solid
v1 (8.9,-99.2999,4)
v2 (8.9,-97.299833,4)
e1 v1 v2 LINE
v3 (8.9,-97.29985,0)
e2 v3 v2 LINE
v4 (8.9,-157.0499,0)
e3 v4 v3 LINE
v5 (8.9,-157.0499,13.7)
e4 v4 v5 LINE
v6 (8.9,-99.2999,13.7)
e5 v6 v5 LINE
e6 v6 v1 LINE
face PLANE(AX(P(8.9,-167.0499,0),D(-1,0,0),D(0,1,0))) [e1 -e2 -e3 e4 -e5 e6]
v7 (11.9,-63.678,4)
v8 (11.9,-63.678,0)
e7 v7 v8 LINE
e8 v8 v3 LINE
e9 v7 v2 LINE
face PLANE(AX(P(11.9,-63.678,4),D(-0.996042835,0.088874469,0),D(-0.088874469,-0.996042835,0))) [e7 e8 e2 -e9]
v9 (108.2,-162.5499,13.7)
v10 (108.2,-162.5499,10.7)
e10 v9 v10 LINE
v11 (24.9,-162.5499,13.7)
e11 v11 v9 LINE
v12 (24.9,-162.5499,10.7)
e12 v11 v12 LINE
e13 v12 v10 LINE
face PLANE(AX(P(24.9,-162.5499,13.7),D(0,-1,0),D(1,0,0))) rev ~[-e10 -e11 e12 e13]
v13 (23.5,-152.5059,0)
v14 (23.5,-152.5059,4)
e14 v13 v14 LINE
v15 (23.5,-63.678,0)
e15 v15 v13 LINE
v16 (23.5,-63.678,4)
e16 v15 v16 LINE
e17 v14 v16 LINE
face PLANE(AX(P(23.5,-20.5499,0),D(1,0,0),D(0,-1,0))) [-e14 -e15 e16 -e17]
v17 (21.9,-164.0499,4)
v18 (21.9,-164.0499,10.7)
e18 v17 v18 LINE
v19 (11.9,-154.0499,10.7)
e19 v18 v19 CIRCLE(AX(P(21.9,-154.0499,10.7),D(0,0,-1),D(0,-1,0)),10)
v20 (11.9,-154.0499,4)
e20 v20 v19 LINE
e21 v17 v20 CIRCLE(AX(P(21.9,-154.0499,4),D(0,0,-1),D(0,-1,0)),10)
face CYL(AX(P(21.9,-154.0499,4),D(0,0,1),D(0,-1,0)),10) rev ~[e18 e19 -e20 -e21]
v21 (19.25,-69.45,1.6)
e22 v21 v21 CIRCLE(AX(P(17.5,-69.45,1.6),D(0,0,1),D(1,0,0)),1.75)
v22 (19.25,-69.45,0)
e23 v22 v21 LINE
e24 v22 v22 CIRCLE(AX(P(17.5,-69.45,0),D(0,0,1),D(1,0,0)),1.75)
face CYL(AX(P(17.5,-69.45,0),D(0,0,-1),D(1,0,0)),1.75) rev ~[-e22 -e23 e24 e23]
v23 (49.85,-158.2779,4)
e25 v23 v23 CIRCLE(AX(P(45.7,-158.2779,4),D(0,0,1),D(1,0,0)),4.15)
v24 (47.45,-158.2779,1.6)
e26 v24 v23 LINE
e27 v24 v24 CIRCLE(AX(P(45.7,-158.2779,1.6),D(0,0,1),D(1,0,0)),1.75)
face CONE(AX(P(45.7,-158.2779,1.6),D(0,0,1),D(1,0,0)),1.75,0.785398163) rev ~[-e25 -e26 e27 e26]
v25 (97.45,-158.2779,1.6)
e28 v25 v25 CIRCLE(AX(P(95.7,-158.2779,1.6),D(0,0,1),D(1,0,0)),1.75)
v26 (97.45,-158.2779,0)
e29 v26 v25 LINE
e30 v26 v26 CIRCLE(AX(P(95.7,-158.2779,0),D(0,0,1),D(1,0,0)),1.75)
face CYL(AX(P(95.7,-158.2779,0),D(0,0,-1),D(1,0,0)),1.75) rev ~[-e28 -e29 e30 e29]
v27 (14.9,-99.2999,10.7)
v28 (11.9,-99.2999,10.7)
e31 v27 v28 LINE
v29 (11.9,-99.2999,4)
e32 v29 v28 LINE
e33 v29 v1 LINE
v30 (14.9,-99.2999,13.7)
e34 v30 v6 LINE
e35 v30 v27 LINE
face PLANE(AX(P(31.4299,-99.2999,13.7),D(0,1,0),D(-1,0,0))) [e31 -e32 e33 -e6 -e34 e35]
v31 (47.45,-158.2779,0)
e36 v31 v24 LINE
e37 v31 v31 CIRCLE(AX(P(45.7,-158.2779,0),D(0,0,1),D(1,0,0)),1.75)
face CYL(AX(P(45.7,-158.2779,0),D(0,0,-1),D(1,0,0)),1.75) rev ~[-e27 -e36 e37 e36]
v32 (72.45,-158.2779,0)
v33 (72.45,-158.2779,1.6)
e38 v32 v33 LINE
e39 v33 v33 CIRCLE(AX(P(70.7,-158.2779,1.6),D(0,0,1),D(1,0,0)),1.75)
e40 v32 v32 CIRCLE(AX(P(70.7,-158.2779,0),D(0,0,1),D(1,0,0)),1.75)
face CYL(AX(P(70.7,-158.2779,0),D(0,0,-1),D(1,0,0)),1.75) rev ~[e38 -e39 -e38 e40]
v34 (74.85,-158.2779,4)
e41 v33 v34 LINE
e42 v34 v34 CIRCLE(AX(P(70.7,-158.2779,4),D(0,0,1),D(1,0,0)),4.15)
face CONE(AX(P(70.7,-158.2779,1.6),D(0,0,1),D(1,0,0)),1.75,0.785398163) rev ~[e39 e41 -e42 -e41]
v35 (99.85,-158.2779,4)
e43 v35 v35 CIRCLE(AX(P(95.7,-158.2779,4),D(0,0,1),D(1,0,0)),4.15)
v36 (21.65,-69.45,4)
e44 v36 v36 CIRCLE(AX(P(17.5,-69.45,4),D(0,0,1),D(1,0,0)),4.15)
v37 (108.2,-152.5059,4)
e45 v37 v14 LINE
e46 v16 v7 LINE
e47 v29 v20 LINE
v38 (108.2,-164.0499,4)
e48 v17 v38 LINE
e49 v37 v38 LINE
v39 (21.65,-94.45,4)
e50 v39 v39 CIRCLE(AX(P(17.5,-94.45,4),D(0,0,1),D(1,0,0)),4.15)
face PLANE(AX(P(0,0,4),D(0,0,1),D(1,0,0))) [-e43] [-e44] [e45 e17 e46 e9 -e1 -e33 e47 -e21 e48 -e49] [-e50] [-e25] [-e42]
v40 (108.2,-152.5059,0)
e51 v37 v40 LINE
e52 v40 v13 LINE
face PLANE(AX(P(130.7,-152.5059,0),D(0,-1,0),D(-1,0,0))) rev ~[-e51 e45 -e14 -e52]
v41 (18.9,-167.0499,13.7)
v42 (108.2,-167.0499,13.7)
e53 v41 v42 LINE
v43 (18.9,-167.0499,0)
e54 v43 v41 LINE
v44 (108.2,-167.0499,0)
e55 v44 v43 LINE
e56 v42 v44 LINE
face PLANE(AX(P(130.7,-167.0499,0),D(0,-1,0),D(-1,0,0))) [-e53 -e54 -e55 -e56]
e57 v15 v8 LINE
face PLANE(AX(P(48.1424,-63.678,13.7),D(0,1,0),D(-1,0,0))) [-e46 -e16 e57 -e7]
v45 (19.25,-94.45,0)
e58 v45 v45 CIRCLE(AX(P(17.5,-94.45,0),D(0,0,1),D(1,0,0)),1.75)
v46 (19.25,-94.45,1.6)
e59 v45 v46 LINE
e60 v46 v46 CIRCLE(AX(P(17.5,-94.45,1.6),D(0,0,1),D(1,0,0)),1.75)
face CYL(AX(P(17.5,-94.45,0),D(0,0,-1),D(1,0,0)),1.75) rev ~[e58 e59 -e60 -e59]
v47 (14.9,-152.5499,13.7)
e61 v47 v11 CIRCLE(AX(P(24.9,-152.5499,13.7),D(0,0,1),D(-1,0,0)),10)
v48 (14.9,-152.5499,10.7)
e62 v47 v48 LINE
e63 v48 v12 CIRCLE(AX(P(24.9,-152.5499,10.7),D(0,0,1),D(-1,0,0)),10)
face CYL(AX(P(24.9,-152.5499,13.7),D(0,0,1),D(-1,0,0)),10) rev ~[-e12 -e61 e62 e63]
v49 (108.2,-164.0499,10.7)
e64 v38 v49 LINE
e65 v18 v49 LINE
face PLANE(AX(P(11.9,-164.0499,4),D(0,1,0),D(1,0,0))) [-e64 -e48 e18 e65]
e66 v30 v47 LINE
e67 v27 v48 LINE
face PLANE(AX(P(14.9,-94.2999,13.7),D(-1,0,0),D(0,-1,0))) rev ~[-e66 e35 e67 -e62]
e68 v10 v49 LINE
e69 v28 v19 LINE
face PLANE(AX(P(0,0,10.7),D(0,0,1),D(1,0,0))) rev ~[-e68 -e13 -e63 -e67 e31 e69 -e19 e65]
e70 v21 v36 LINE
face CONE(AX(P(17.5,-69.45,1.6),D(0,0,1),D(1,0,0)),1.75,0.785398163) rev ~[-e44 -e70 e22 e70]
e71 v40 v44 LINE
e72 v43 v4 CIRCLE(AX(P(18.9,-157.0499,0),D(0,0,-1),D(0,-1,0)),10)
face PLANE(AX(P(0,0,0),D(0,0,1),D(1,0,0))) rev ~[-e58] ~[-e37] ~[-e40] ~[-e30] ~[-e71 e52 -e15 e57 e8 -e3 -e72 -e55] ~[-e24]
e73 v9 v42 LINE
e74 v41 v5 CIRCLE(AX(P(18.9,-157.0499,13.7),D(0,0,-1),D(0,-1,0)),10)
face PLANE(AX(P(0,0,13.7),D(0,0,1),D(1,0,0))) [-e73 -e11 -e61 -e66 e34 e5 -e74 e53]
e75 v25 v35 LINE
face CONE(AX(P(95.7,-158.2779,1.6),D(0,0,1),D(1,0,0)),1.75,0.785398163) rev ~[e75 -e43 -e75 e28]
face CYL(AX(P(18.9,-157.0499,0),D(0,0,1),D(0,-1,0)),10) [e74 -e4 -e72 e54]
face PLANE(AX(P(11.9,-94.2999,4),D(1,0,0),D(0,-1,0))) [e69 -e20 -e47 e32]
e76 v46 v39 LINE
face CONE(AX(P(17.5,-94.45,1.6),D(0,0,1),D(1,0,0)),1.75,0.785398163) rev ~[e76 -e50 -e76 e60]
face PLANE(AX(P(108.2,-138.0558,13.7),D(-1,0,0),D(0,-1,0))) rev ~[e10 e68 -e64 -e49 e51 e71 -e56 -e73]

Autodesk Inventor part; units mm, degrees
ref_plane "YZ Plane" through (0, 0, 0) normal (1, 0, 0) x (0, 1, 0)
ref_plane "XZ Plane" through (0, 0, 0) normal (0, 1, 0) x (-1, 0, 0)
ref_plane "XY Plane" through (0, 0, 0) normal (0, 0, 1) x (1, 0, 0)
sketch "Sketch1" plane through (0, 0, 0) normal (0, 0, 1) x (1, 0, 0)
  circle A0 centre (120.7, -158.2779) radius 1.75
  circle A1 centre (95.7, -158.2779) radius 1.75
  circle A2 centre (70.7, -158.2779) radius 1.75
  circle A3 centre (17.5, -69.45) radius 1.75
  circle A4 centre (17.5, -94.45) radius 1.75
  line L0 (135.7, -152.5058) -> (135.7, -164.0501) construction
  circle A5 centre (45.7, -158.2779) radius 1.75
  line L1 (0, 0) -> (135.7, 0) construction
  line L2 (135.7, 0) -> (135.7, -9.1902) construction
  circle A6 centre (125.7, -4.5951) radius 1.75 construction
  circle A7 centre (115.7, -4.5951) radius 1.75 construction
  line L3 (-18.071, -149.5998) -> (178.1747, -149.5998) construction
  line L4 (23.9, 14.4501) -> (135.7, 14.4501)
  line L5 (135.7, 14.4501) -> (135.7, -164.0499)
  line L6 (135.7, -164.0499) -> (23.9, -164.0499)
  line L7 (11.9, -152.0499) -> (11.9, 2.4501)
  arc A8 (23.9, 14.4501) -> (11.9, 2.4501) centre (23.9, 2.4501) ccw
  arc A9 (11.9, -152.0499) -> (23.9, -164.0499) centre (23.9, -152.0499) ccw construction
  line L8 (11.9, -20.5499) -> (8.9, -20.5499)
  line L9 (8.9, -20.5499) -> (8.9, -164.0499)
  line L10 (8.9, -164.0499) -> (11.9, -164.0499)
  line L11 (11.9, -154.0499) -> (11.9, -20.5499)
  line L12 (8.9, -55.2999) -> (11.9, -55.2999)
  line L13 (11.9, -55.2999) -> (11.9, -94.2999)
  line L14 (11.9, -94.2999) -> (8.9, -94.2999)
  line L15 (8.9, -94.2999) -> (8.9, -55.2999)
  line L16 (21.9, -164.0499) -> (135.7, -164.0499)
  line L17 (135.7, -164.0499) -> (135.7, -167.0499)
  line L18 (135.7, -167.0499) -> (8.9, -167.0499)
  line L19 (8.9, -167.0499) -> (8.9, -164.0499)
  arc A10 (11.9, -154.0499) -> (21.9, -164.0499) centre (21.9, -154.0499) ccw
  line L20 (8.9, -20.5499) -> (23.5, -20.5499)
  line L21 (23.5, -167.0499) -> (8.9, -167.0499)
  line L22 (8.9, -167.0499) -> (8.9, -20.5499)
  line L23 (135.7, -138.0558) -> (135.7, -164.0499)
  line L24 (135.7, -164.0499) -> (11.9, -164.0499)
  line L25 (11.9, -164.0499) -> (11.9, -138.0558)
  line L26 (23.5, -20.5499) -> (23.5, -138.0558)
  line L27 (23.5, -149.5998) -> (23.5, -167.0499)
  line L28 (130.7, -138.0558) -> (130.7, -167.0499)
  line L29 (130.7, -167.0499) -> (135.7, -167.0499)
  line L30 (135.7, -167.0499) -> (135.7, -138.0558)
  line L31 (-26.1104, -138.0558) -> (23.5, -138.0558) construction
  line L32 (135.7, -138.0558) -> (178.6938, -138.0558) construction
  circle A11 centre (118.0205, -143.8278) radius 1.75 construction
  line L33 (130.7, -138.0558) -> (130.7, -152.5059)
  line L34 (130.7, -152.5059) -> (23.5, -152.5059)
  line L35 (23.5, -152.5059) -> (23.5, -138.0558)
  point P0 (20.72, -105.8556)
  point P1 (11.9, -164.0499)
  dimension "d0" = 3.5
  dimension "d1" = 3.5
  dimension "d2" = 3.5
  dimension "d3" = 3.5
  dimension "d4" = 3.5
  dimension "d5" = 15
  dimension "d6" = 25
  dimension "d7" = 25
  dimension "d8" = 3.5
  dimension "d9" = 25
  dimension "d10" = 69.45
  dimension "d11" = 25
  dimension "d13" = 3.5
  dimension "d14" = 3.5
  dimension "d15" = 10
  dimension "d16" = 10
  dimension "d17" = 17.5
  dimension "d18" = 0
  dimension "d20" = 123.8
  dimension "d21" = 178.5
  dimension "d22" = 149.5999
  dimension "d23" = 12
  dimension "d26" = 14.4501
  dimension "d27" = 0
  dimension "d28" = 0
  dimension "d29" = 135.7
  dimension "d30" = 3
  dimension "d31" = 35
  dimension "d32" = 0
  dimension "d33" = 3
  dimension "d34" = 39
  dimension "d35" = 69.75
  dimension "d36" = 3
  dimension "d37" = 0
  dimension "d38" = 10
  dimension "d46" = 5
  dimension "d72" = 5.772
  dimension "d73" = 3.5
  dimension "d74" = 5.772
  dimension "d75" = 14.4501
  dimension "d76" = 5.772
extrude "Extrusion1" add sketch "Sketch1" along normal blind 4 contours A0 | L20 L26 L35 L27 L16 A10 L11 L7 | L7 L12 L9 L8 | L28 L18 L27 L16 L6 | L6 L16 L27 L34 L28 | L7 L11 L25 L10 L9 L14 | L27 L18 L19 L10 L24 L16 | L24 L25 A10
chamfer "Chamfer1" distance 2.4 angle 45 5 edges at (15.75, -69.45, 4) (15.75, -94.45, 4) (43.95, -158.2779, 4) (68.95, -158.2779, 4) (93.95, -158.2779, 4)
sketch "Sketch2" plane through (0, 0, 4) normal (0, 0, 1) x (1, 0, 0)
  line L0 (8.9, -20.5499) -> (8.9, -55.2999) projected
  line L1 (11.9, -94.2999) -> (11.9, -55.2999) projected
  line L2 (8.9, -20.5499) -> (11.9, -20.5499)
  line L3 (11.9, -20.5499) -> (11.9, -55.2999)
  line L4 (11.9, -55.2999) -> (8.9, -55.2999)
  line L5 (8.9, -55.2999) -> (8.9, -20.5499)
  line L6 (8.9, -94.2999) -> (8.9, -167.0499) projected
  line L7 (8.9, -167.0499) -> (130.7, -167.0499) projected
  line L8 (8.9, -94.2999) -> (11.9, -94.2999)
  line L9 (11.9, -94.2999) -> (11.9, -167.0499)
  line L10 (11.9, -167.0499) -> (8.9, -167.0499)
  line L11 (8.9, -167.0499) -> (8.9, -94.2999)
  line L12 (130.7, -167.0499) -> (11.9, -167.0499)
  line L13 (11.9, -167.0499) -> (11.9, -164.0499)
  line L14 (11.9, -164.0499) -> (130.7, -164.0499)
  line L15 (130.7, -164.0499) -> (130.7, -167.0499)
  point P0 (0, 0)
  dimension "d47" = 3
extrude "Extrusion2" add sketch "Sketch2" along normal blind 9.7
sketch "Sketch3" plane through (0, 0, 13.7) normal (0, 0, 1) x (1, 0, 0)
  line L0 (8.9, -94.2999) -> (8.9, -167.0499) projected
  line L1 (8.9, -167.0499) -> (130.7, -167.0499) projected
  line L2 (8.9, -94.2999) -> (14.9, -94.2999)
  line L3 (14.9, -94.2999) -> (14.9, -152.5499)
  line L4 (14.9, -167.0499) -> (8.9, -167.0499)
  line L5 (8.9, -167.0499) -> (8.9, -94.2999)
  line L6 (130.7, -167.0499) -> (14.9, -167.0499)
  line L7 (14.9, -167.0499) -> (14.9, -162.5499)
  line L8 (24.9, -162.5499) -> (130.7, -162.5499)
  line L9 (130.7, -162.5499) -> (130.7, -167.0499)
  line L10 (8.9, -20.5499) -> (8.9, -55.2999) projected
  line L11 (8.9, -20.5499) -> (14.9, -20.5499)
  line L12 (14.9, -20.5499) -> (14.9, -55.2999)
  line L13 (14.9, -55.2999) -> (8.9, -55.2999)
  line L14 (8.9, -55.2999) -> (8.9, -20.5499)
  arc A0 (14.9, -152.5499) -> (24.9, -162.5499) centre (24.9, -152.5499) ccw
  point P0 (0, 0)
  dimension "d50" = 6
  dimension "d51" = 4.5
  dimension "d52" = 6
  dimension "d53" = 10
extrude "Extrusion3" add sketch "Sketch3" against normal blind 3
sketch "Sketch4" plane through (0, 0, 13.7) normal (0, 0, 1) x (1, 0, 0)
  line L0 (130.7, -164.0499) -> (130.7, -152.5059) projected
  line L1 (130.7, -138.0558) -> (108.2, -138.0558)
  line L2 (108.2, -138.0558) -> (108.2, -174.4864)
  line L3 (108.2, -174.4864) -> (130.7, -174.4864)
  line L4 (130.7, -174.4864) -> (130.7, -138.0558)
  line L5 (-4.6471, -18.4715) -> (48.1424, -18.4715)
  line L6 (48.1424, -18.4715) -> (48.1424, -63.678)
  line L7 (48.1424, -63.678) -> (-4.6471, -63.678)
  line L8 (-4.6471, -63.678) -> (-4.6471, -18.4715)
  circle A0 centre (17.5, -69.45) radius 4.15 projected
  circle A1 centre (17.5, -69.45) radius 0.7081
  point P0 (0, 0)
  dimension "d62" = 22.5
  dimension "d79" = 5.772
extrude "Extrusion5" cut sketch "Sketch4" against normal blind 22.05 contours L4 L3 L2 L1 L0 | L5 L6 L7 L8
sketch "Sketch5" plane through (0, 0, 13.7) normal (0, 0, 1) x (1, 0, 0)
  line L0 (-3.6304, -50.2999) -> (31.4299, -50.2999)
  line L1 (31.4299, -50.2999) -> (31.4299, -99.2999)
  line L2 (31.4299, -99.2999) -> (-3.6304, -99.2999)
  line L3 (-3.6304, -99.2999) -> (-3.6304, -50.2999)
  line L4 (8.9, -55.2999) -> (14.9, -55.2999) projected
  line L5 (14.9, -94.2999) -> (8.9, -94.2999) projected
  point P0 (0, 0)
  dimension "d67" = 5
  dimension "d68" = 5
extrude "Extrusion6" cut sketch "Sketch5" against normal up to surface (9.7 mm away)
fillet "Fillet1" radius 10 1 edges at (8.9, -167.0499, 6.85)
fillet "Fillet2" radius 10 1 edges at (11.9, -164.0499, 7.35)
chamfer "Chamfer3" distance 3 angle 45 1 edges at (8.9, -94.2999, 2)
sketch "Sketch6" plane through (0, 0, 4) normal (0, 0, 1) x (1, 0, 0)
  line L0 (11.9, -63.678) -> (11.9, -94.2999) projected
  line L1 (8.9, -97.2999) -> (11.9, -94.2999) projected
  line L2 (11.9, -63.678) -> (8.9, -97.2999)
  line L3 (8.9, -97.2999) -> (11.9, -94.2999)
  line L4 (11.9, -94.2999) -> (11.9, -63.678)
  point P0 (0, 0)
extrude "Extrusion7" add sketch "Sketch6" against normal up to surface (4 mm away)
equation "\"d26\" = -0.5 * d22 + 0.5 * d21"
equation "\"d35\" = -0.5 * d34 + 0.5 * d21"
equation "\"d39\" = d19"
equation "\"d19\" = 5.772"
properties part number "iPadGolf6HolderMount"
